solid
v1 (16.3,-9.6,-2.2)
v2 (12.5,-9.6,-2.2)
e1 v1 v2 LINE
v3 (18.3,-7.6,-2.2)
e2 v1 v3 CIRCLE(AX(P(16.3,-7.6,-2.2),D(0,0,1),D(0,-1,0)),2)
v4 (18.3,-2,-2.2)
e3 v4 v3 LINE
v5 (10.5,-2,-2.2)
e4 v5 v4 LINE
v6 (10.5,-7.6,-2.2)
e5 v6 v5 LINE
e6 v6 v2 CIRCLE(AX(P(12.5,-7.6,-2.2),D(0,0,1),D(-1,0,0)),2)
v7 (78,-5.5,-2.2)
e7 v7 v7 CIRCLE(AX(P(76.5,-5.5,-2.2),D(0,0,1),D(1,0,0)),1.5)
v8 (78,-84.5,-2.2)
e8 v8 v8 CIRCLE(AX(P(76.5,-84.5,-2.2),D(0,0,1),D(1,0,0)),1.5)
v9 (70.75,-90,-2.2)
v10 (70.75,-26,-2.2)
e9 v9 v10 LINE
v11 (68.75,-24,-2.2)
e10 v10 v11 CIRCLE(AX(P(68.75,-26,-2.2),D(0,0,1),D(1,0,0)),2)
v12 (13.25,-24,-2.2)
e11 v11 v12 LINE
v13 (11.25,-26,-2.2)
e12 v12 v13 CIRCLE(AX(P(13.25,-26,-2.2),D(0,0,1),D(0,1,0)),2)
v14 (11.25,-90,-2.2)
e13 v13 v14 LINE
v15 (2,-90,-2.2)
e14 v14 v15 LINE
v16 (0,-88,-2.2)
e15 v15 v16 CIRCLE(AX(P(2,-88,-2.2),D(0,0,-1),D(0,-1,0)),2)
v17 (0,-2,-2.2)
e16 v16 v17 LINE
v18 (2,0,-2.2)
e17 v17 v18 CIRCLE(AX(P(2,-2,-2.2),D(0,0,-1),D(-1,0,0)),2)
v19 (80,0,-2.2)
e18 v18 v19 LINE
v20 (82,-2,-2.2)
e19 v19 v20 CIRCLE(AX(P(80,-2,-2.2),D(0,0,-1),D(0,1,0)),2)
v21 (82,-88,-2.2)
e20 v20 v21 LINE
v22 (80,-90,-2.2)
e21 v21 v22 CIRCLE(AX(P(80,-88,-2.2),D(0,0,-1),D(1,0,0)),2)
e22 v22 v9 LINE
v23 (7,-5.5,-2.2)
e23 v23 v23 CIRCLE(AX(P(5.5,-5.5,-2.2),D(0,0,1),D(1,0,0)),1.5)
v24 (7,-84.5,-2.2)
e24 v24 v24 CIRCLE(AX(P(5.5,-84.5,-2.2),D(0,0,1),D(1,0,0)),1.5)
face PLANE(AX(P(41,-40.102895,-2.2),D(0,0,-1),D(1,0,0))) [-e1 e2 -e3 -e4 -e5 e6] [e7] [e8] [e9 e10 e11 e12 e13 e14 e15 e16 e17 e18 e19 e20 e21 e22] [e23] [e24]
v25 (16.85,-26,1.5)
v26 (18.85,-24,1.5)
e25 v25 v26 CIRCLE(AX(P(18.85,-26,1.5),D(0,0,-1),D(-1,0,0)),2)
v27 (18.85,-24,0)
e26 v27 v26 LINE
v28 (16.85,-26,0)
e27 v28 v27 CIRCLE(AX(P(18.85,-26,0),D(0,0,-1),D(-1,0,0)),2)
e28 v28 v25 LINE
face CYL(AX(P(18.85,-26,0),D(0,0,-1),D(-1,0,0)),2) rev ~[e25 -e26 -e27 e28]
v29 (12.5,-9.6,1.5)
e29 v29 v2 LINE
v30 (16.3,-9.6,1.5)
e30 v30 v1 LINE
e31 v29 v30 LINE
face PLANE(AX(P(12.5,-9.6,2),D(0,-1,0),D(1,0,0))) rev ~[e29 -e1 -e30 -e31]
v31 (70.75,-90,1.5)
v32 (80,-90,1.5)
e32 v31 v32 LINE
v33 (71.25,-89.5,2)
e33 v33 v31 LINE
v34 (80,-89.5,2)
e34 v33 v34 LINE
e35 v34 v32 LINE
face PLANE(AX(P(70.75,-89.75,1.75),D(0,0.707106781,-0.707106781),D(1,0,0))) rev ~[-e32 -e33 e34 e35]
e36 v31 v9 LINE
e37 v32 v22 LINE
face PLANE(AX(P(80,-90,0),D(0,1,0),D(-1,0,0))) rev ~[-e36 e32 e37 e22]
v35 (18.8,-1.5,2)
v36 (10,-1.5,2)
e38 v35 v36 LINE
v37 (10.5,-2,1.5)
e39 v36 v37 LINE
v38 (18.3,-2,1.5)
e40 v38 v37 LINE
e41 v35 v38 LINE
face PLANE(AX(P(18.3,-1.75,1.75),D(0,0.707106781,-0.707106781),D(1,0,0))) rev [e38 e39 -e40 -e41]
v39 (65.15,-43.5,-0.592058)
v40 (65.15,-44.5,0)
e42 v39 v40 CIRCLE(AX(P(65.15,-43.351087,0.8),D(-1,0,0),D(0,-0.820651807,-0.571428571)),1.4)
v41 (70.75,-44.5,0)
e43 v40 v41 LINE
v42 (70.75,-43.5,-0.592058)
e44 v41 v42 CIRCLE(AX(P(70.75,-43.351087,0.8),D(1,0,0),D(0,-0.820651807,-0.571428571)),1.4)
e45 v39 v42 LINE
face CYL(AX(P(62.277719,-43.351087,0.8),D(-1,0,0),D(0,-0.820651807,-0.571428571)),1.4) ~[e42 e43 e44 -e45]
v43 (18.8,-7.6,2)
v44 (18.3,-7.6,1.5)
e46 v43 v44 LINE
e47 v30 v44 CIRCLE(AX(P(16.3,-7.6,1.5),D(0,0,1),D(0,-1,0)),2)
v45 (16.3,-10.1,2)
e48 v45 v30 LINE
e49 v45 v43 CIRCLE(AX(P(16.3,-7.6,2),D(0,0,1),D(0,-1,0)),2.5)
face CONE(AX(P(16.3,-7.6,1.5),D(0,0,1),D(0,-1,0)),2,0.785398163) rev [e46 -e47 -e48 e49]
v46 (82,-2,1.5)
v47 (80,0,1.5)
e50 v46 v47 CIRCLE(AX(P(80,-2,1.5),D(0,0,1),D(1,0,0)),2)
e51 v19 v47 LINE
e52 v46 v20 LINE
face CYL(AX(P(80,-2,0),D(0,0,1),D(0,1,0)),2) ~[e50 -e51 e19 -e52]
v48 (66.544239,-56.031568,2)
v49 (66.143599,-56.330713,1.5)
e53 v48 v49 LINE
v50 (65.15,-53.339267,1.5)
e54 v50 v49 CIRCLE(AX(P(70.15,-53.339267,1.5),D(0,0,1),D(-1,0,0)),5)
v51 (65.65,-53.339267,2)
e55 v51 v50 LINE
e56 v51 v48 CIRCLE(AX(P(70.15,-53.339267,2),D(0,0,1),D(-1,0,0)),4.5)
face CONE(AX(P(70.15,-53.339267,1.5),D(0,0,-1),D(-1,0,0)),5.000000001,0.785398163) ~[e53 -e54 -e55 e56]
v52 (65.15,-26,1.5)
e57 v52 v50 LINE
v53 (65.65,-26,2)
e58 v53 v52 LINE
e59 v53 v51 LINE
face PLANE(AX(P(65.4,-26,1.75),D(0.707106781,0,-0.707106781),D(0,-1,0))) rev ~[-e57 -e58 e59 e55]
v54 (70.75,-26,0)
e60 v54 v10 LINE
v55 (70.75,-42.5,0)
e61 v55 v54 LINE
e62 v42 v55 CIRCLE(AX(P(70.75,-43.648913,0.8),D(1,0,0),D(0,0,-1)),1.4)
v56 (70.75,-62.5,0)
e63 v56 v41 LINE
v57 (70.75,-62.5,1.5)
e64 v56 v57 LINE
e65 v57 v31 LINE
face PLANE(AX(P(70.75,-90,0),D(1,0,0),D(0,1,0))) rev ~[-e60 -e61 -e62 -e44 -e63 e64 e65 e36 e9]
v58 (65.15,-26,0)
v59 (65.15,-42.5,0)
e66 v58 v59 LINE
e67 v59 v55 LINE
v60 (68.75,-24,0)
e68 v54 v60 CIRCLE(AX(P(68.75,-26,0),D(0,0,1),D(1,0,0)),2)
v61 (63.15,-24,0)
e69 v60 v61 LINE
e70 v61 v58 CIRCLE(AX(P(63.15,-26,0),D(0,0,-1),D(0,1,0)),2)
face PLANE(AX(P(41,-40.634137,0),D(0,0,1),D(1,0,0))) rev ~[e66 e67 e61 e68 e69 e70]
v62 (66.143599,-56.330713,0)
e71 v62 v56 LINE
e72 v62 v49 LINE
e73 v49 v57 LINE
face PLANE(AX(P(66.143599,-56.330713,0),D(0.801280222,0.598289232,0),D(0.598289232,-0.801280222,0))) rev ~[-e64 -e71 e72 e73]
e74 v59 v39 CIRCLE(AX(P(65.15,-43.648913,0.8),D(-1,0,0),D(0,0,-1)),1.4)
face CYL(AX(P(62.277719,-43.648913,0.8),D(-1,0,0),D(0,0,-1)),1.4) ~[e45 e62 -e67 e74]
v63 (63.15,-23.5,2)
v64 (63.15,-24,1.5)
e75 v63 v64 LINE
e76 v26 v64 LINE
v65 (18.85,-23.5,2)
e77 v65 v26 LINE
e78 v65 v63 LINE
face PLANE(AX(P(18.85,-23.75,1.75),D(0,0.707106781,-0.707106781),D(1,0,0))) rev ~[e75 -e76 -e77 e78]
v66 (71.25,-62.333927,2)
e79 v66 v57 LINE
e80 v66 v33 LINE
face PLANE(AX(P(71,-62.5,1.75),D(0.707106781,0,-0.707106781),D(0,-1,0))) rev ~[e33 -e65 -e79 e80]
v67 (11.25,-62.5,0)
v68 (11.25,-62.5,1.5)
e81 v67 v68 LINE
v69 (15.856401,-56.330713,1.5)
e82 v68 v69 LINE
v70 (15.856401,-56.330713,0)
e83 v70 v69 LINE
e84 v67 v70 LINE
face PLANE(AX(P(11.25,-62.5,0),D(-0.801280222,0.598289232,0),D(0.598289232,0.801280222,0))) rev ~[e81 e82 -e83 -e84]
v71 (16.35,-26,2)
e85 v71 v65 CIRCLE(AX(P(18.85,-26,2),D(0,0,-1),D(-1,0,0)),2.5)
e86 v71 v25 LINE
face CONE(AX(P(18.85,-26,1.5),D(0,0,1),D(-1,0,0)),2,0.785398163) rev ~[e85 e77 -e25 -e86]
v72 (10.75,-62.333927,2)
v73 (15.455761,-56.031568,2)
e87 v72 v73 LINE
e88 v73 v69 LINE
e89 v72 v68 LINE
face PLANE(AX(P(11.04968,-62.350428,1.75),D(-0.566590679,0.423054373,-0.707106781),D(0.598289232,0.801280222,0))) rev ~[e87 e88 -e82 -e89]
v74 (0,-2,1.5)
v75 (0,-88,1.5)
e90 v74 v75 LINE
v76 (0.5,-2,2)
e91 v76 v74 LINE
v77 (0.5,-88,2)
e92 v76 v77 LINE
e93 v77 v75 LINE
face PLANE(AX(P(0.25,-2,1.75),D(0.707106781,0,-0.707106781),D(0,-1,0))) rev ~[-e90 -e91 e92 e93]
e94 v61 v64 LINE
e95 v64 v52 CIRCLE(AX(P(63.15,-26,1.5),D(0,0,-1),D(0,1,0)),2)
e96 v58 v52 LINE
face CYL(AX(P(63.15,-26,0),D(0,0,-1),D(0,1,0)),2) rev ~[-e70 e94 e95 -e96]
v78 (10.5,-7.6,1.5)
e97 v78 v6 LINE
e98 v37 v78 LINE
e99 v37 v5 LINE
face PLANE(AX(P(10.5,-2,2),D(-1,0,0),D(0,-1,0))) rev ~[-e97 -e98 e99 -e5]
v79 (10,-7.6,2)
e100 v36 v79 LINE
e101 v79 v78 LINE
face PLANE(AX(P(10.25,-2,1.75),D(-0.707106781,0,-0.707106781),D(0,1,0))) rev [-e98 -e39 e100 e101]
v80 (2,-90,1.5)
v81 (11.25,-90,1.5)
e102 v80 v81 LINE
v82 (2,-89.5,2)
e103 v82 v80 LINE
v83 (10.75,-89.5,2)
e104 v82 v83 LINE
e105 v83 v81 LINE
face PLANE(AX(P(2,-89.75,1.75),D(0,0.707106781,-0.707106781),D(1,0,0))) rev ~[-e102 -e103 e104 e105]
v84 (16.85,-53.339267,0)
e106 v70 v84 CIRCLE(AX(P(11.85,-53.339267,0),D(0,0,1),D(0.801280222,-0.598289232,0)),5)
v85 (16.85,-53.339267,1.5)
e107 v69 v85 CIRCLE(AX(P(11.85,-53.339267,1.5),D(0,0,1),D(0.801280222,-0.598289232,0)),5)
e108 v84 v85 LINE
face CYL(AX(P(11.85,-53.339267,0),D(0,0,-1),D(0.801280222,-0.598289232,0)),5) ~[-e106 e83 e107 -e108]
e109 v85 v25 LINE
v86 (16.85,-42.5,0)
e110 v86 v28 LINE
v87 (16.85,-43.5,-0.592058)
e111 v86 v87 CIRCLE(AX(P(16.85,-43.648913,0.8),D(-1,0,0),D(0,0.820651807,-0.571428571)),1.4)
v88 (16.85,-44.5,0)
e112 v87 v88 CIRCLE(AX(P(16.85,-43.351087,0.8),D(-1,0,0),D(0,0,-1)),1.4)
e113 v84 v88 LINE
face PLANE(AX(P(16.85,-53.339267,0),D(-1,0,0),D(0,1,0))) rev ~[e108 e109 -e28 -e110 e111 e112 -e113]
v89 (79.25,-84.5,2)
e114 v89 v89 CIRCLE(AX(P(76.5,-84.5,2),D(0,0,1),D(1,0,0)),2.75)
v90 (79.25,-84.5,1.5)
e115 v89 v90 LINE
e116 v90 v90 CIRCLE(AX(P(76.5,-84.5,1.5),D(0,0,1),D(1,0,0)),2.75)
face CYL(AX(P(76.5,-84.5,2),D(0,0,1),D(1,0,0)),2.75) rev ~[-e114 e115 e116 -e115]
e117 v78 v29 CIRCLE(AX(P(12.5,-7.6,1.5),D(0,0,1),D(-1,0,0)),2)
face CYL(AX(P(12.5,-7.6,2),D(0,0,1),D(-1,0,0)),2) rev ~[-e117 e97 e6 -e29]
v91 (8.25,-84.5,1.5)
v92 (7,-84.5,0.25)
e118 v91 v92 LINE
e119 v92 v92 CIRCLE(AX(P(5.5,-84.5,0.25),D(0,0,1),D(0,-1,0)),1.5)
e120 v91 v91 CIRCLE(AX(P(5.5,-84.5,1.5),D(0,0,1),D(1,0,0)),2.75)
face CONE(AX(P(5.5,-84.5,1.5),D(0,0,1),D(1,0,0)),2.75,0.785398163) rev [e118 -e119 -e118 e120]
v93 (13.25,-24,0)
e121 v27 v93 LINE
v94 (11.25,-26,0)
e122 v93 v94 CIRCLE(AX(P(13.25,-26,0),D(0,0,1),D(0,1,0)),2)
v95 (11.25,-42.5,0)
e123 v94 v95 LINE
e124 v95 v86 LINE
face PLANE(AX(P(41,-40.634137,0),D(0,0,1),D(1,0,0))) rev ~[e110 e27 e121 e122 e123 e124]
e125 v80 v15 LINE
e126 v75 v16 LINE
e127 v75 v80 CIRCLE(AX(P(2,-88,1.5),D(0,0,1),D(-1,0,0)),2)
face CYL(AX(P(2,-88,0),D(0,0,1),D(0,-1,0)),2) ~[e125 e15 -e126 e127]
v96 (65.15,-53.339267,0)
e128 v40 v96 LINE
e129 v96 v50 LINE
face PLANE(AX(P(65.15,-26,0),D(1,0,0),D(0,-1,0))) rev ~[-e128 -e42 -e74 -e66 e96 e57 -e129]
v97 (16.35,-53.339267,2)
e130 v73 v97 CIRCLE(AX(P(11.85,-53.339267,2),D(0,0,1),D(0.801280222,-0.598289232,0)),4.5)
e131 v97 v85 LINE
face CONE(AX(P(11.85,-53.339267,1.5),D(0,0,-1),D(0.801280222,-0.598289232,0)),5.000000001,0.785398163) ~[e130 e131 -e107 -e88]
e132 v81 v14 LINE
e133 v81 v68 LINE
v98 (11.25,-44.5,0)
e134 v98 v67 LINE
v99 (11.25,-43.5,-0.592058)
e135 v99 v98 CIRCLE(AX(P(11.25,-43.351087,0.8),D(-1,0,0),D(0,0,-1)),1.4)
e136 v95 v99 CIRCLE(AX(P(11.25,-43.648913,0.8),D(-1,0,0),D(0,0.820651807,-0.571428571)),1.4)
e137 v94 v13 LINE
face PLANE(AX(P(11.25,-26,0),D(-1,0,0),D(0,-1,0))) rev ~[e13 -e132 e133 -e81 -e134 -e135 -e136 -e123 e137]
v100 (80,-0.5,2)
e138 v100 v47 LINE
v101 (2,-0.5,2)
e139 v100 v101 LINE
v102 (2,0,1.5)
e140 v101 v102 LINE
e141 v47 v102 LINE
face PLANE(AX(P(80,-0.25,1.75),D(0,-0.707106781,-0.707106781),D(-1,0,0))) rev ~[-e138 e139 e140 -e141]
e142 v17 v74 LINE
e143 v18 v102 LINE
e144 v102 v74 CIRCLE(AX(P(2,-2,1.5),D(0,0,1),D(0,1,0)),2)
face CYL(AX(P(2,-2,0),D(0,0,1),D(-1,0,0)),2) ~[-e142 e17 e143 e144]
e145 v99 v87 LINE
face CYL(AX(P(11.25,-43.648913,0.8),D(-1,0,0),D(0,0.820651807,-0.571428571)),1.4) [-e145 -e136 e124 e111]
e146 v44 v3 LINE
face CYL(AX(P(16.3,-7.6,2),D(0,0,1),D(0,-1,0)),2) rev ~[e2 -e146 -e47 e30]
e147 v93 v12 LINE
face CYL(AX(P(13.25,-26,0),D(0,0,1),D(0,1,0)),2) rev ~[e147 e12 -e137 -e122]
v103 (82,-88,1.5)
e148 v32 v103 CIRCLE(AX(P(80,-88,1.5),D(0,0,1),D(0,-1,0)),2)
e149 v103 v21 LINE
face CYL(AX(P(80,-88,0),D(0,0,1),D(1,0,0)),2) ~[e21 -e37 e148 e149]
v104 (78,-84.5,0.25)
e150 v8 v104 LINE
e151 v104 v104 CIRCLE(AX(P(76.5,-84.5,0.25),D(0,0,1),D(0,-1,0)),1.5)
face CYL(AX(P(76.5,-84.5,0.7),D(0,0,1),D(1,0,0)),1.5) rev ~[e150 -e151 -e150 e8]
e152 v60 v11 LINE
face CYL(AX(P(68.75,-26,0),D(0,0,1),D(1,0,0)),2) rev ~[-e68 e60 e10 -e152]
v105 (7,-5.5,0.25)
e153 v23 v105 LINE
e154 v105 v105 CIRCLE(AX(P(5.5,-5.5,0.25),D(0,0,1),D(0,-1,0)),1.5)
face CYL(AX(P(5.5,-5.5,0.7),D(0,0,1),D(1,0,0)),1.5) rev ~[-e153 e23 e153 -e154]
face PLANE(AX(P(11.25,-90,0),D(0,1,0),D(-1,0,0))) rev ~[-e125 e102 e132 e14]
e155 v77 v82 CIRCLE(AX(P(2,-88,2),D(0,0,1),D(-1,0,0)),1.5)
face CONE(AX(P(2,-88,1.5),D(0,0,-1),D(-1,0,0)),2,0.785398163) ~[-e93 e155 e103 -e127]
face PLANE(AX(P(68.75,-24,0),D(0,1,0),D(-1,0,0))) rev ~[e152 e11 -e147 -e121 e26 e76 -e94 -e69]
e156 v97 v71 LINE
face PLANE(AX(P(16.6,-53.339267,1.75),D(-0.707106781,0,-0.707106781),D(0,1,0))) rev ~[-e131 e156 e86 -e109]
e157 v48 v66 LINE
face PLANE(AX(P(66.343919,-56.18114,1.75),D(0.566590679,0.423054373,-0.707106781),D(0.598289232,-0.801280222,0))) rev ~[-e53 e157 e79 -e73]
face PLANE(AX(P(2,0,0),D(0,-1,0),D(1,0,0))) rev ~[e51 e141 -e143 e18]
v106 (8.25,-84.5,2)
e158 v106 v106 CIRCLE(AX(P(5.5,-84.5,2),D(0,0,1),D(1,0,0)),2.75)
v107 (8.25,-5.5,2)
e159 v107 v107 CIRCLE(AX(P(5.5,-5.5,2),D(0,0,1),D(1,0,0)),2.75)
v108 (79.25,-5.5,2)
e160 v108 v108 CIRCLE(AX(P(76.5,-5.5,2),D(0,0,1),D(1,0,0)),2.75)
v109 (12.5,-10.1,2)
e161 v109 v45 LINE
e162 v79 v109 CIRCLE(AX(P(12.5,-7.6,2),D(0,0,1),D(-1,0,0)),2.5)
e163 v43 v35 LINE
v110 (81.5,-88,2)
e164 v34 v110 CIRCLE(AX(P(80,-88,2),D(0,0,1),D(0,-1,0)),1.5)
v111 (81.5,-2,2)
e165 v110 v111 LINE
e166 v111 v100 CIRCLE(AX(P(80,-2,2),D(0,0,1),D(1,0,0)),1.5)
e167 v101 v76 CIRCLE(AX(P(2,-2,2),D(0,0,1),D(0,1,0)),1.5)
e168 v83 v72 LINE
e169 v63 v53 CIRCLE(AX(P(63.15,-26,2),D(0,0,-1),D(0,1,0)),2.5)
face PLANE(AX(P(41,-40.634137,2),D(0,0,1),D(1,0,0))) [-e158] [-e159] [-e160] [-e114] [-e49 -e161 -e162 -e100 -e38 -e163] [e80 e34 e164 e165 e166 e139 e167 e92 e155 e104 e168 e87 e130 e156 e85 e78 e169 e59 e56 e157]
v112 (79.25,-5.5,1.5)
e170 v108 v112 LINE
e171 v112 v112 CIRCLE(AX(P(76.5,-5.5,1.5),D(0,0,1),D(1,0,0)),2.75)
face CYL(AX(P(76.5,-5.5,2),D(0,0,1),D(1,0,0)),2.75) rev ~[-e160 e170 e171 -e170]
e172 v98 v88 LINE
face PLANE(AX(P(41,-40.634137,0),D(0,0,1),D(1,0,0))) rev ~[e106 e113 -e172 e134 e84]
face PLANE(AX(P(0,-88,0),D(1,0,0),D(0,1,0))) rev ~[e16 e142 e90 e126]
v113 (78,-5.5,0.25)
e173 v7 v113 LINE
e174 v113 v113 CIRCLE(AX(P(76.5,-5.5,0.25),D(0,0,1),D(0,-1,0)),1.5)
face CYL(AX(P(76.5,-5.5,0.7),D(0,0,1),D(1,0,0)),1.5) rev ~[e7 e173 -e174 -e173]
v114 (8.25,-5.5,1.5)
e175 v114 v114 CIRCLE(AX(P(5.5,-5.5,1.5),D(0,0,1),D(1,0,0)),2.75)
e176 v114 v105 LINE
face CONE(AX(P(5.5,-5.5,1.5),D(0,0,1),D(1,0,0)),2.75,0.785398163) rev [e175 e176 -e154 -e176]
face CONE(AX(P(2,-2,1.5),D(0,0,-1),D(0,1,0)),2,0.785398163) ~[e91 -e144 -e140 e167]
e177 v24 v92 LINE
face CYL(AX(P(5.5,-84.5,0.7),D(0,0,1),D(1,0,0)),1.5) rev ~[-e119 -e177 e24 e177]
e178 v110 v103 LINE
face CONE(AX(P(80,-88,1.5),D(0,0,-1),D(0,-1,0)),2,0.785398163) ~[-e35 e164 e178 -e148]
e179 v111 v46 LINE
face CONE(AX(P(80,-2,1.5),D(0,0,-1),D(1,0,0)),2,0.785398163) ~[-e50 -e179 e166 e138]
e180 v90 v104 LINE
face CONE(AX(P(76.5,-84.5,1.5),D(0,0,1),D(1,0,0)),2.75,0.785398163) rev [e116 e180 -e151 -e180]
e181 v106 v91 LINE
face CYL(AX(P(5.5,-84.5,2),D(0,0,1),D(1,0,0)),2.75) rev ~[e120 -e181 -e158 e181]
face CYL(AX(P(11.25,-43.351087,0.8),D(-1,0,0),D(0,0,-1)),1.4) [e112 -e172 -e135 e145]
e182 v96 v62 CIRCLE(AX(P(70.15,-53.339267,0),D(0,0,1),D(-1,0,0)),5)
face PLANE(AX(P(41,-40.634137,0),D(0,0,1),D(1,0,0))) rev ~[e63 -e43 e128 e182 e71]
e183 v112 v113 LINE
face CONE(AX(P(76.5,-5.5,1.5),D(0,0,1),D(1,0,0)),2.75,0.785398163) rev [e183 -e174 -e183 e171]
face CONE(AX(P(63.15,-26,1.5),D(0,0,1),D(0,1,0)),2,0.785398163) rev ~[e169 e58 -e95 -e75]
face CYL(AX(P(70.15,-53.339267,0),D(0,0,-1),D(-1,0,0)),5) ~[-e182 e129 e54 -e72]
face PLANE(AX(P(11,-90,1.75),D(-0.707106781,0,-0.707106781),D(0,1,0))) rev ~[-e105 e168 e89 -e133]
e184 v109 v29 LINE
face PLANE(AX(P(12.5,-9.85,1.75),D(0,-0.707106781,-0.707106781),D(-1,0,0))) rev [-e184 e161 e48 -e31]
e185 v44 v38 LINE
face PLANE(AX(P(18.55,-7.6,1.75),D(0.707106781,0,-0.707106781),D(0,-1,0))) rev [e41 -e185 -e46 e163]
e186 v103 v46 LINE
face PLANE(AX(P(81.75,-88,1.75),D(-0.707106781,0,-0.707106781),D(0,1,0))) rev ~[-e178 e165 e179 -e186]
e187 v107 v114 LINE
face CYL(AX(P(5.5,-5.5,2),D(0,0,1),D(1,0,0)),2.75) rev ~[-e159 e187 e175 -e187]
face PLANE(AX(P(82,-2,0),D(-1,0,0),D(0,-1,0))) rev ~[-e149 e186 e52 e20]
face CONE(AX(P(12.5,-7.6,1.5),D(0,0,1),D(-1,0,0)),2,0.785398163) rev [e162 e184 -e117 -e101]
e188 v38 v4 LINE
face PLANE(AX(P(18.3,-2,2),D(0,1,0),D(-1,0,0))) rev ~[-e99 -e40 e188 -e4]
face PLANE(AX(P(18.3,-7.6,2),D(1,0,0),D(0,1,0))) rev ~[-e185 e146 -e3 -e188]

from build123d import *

# Parameters (mm, degrees)
F1_DEPTH      = 2
F3_DEPTH      = 2.2
F5_DEPTH      = 25
F6_R          = 1.5
F7_DEPTH      = 4.2
F8_R          = 2.75
F9_DEPTH      = 2
F10_S5_R      = 1.5
F10_T6_DEPTH  = 5
F10_S11_R     = 1.5
F10_T12_DEPTH = 5
F10_S17_R     = 1.5
F10_T18_DEPTH = 5
F10_S23_R     = 1.5
F10_T24_DEPTH = 5
F11_W         = 5.6
F11_H         = 2
F12_DEPTH     = 0.6
F13_T1_DEPTH  = 8.4722813233
F13_T3_DEPTH  = 8.4722813233
F14_SIZE      = 0.5


# Not quite as in the source:
# - a fillet or chamfer that OpenCascade refuses, or shapes differently, is made with other operations: its cross-section is extruded or revolved along the edge and cut away or added


with BuildPart() as f1:
    # F0 (on Top) → F1 (new body)
    with BuildSketch(Plane.XY):
        with BuildLine():
            Line((80, 0), (2, 0))
            ThreePointArc((2, 0), (0.5857864376, -0.5857864376), (0, -2))
            Line((0, -2), (0, -88))
            ThreePointArc((0, -88), (0.5857864376, -89.4142135624), (2, -90))
            Line((2, -90), (11.25, -90))
            Line((11.25, -90), (11.25, -62.5))
            Line((11.25, -62.5), (15.8564011104, -56.3307127986))
            ThreePointArc((15.8564011104, -56.3307127986), (16.5951030311, -54.9153368199), (16.85, -53.3392666362))
            Line((16.85, -53.3392666362), (16.85, -26))
            ThreePointArc((16.85, -26), (17.4357864376, -24.5857864376), (18.85, -24))
            Line((18.85, -24), (63.15, -24))
            ThreePointArc((63.15, -24), (64.5642135624, -24.5857864376), (65.15, -26))
            Line((65.15, -26), (65.15, -53.3392666362))
            ThreePointArc((65.15, -53.3392666362), (65.4048969689, -54.9153368199), (66.1435988896, -56.3307127986))
            Line((66.1435988896, -56.3307127986), (70.75, -62.5))
            Line((70.75, -62.5), (70.75, -90))
            Line((70.75, -90), (80, -90))
            ThreePointArc((80, -90), (81.4142135624, -89.4142135624), (82, -88))
            Line((82, -88), (82, -2))
            ThreePointArc((82, -2), (81.4142135624, -0.5857864376), (80, 0))
        make_face()
    extrude(amount=F1_DEPTH)

    # F2 (on face) → F3 (join)
    with BuildSketch(Plane(origin=(0, 0, 0), x_dir=(1, 0, 0), z_dir=(0, 0, -1))):
        with BuildLine():
            ThreePointArc((80, 0), (81.4142135624, 0.5857864376), (82, 2))
            Line((82, 2), (82, 88))
            ThreePointArc((82, 88), (81.4142135624, 89.4142135624), (80, 90))
            Line((80, 90), (70.75, 90))
            Line((70.75, 90), (70.75, 62.5))
            Line((70.75, 62.5), (70.75, 26))
            ThreePointArc((70.75, 26), (70.1642135624, 24.5857864376), (68.75, 24))
            Line((68.75, 24), (65.15, 24))
            Line((65.15, 24), (16.85, 24))
            Line((16.85, 24), (13.25, 24))
            ThreePointArc((13.25, 24), (11.8357864376, 24.5857864376), (11.25, 26))
            Line((11.25, 26), (11.25, 62.5))
            Line((11.25, 62.5), (11.25, 90))
            Line((11.25, 90), (2, 90))
            ThreePointArc((2, 90), (0.5857864376, 89.4142135624), (0, 88))
            Line((0, 88), (0, 2))
            ThreePointArc((0, 2), (0.5857864376, 0.5857864376), (2, 0))
            Line((2, 0), (80, 0))
        make_face()
    extrude(amount=F3_DEPTH)

    # F4 (on face) → F5 (cut)
    with BuildSketch(Plane.XY.offset(2)):
        with BuildLine():
            Line((18.3, -2), (10.5, -2))
            Line((10.5, -2), (10.5, -7.6))
            ThreePointArc((10.5, -7.6), (11.0857864376, -9.0142135624), (12.5, -9.6))
            Line((12.5, -9.6), (16.3, -9.6))
            ThreePointArc((16.3, -9.6), (17.7142135624, -9.0142135624), (18.3, -7.6))
            Line((18.3, -7.6), (18.3, -2))
        make_face()
    extrude(amount=-F5_DEPTH, mode=Mode.SUBTRACT)

    # F6 (on face) → F7 (cut)
    with BuildSketch(Plane.XY.offset(2)):
        with Locations((5.5, -84.5)):
            Circle(F6_R)
        with Locations((76.5, -84.5)):
            Circle(F6_R)
        with Locations((5.5, -5.5)):
            Circle(F6_R)
        with Locations((76.5, -5.5)):
            Circle(F6_R)
    extrude(amount=-F7_DEPTH, mode=Mode.SUBTRACT)

    # F8 (on face) → F9 (cut)
    with BuildSketch(Plane.XY.offset(2)):
        with Locations((5.5, -5.5)):
            Circle(F8_R)
        with Locations((76.5, -5.5)):
            Circle(F8_R)
        with Locations((76.5, -84.5)):
            Circle(F8_R)
        with Locations((5.5, -84.5)):
            Circle(F8_R)
    extrude(amount=-F9_DEPTH, mode=Mode.SUBTRACT)

    # F10: chamfer of 1.5 on 4 edges, made by hand


with BuildPart() as f10_tool2:
    # F10_s3 → F10_t4 (revolve)
    with BuildSketch(Plane.XZ.offset(84.5)):
        Polygon((8.25, 1.5), (6.75, 0), (8.25, 0), align=None)
    revolve(axis=Axis((5.5, -84.5, 0), (0, 0, 1)))

    # F10_s5 → F10_t6 (cut, symmetric)
    with BuildSketch(Plane.XY.offset(0.7)):
        with Locations((5.5, -84.5)):
            Circle(F10_S5_R)
    extrude(amount=F10_T6_DEPTH, both=True, mode=Mode.SUBTRACT)


with BuildPart() as f1_1:
    add(f1.part)

    # F10_t1: union F10_tool2
    add(f10_tool2.part)


with BuildPart() as f10_tool8:
    # F10_s9 → F10_t10 (revolve)
    with BuildSketch(Plane.XZ.offset(84.5)):
        Polygon((79.25, 1.5), (77.75, 0), (79.25, 0), align=None)
    revolve(axis=Axis((76.5, -84.5, 0), (0, 0, 1)))

    # F10_s11 → F10_t12 (cut, symmetric)
    with BuildSketch(Plane.XY.offset(0.7)):
        with Locations((76.5, -84.5)):
            Circle(F10_S11_R)
    extrude(amount=F10_T12_DEPTH, both=True, mode=Mode.SUBTRACT)


with BuildPart() as f1_2:
    add(f1_1.part)

    # F10_t7: union F10_tool8
    add(f10_tool8.part)


with BuildPart() as f10_tool14:
    # F10_s15 → F10_t16 (revolve)
    with BuildSketch(Plane.XZ.offset(5.5)):
        Polygon((8.25, 1.5), (6.75, 0), (8.25, 0), align=None)
    revolve(axis=Axis((5.5, -5.5, 0), (0, 0, 1)))

    # F10_s17 → F10_t18 (cut, symmetric)
    with BuildSketch(Plane.XY.offset(0.7)):
        with Locations((5.5, -5.5)):
            Circle(F10_S17_R)
    extrude(amount=F10_T18_DEPTH, both=True, mode=Mode.SUBTRACT)


with BuildPart() as f1_3:
    add(f1_2.part)

    # F10_t13: union F10_tool14
    add(f10_tool14.part)


with BuildPart() as f10_tool20:
    # F10_s21 → F10_t22 (revolve)
    with BuildSketch(Plane.XZ.offset(5.5)):
        Polygon((79.25, 1.5), (77.75, 0), (79.25, 0), align=None)
    revolve(axis=Axis((76.5, -5.5, 0), (0, 0, 1)))

    # F10_s23 → F10_t24 (cut, symmetric)
    with BuildSketch(Plane.XY.offset(0.7)):
        with Locations((76.5, -5.5)):
            Circle(F10_S23_R)
    extrude(amount=F10_T24_DEPTH, both=True, mode=Mode.SUBTRACT)


with BuildPart() as f1_4:
    add(f1_3.part)

    # F10_t19: union F10_tool20
    add(f10_tool20.part)

    # F11 (on face) → F12 (join)
    with BuildSketch(Plane(origin=(0, 0, 0), x_dir=(1, 0, 0), z_dir=(0, 0, -1))):
        with Locations((14.05, 43.5)):
            Rectangle(F11_W, F11_H)
        with Locations((67.95, 43.5)):
            Rectangle(F11_W, F11_H)
    extrude(amount=F12_DEPTH)

    # F13: fillet of radius 1.4 on 4 edges, made by hand

    # F13_s2 → F13_t1 (cut)
    with BuildSketch(Plane.YZ.offset(11.25)):
        with BuildLine():
            ThreePointArc((-42.5, 0), (-43.0008384595, -0.4409673646), (-43.6489125293, -0.6))
            Line((-43.6489125293, -0.6), (-42.5, -0.6))
            Line((-42.5, -0.6), (-42.5, 0))
        make_face()
        with BuildLine():
            ThreePointArc((-43.3510874707, -0.6), (-43.9991615405, -0.4409673646), (-44.5, 0))
            Line((-44.5, 0), (-44.5, -0.6))
            Line((-44.5, -0.6), (-43.3510874707, -0.6))
        make_face()
    extrude(amount=F13_T1_DEPTH, mode=Mode.SUBTRACT)

    # F13_s4 → F13_t3 (cut)
    with BuildSketch(Plane.YZ.offset(62.2777186767)):
        with BuildLine():
            ThreePointArc((-43.6489125293, -0.6), (-43.0008384595, -0.4409673646), (-42.5, 0))
            Line((-42.5, 0), (-42.5, -0.6))
            Line((-42.5, -0.6), (-43.6489125293, -0.6))
        make_face()
        with BuildLine():
            ThreePointArc((-44.5, 0), (-43.9991615405, -0.4409673646), (-43.3510874707, -0.6))
            Line((-43.3510874707, -0.6), (-44.5, -0.6))
            Line((-44.5, -0.6), (-44.5, 0))
        make_face()
    extrude(amount=F13_T3_DEPTH, mode=Mode.SUBTRACT)

    # F14
    f14_edges = [f1_4.edges().sort_by_distance(p)[0] for p in [
        (0.585786, -0.585786, 2),
        (41, 0, 2),
        (0, -45, 2),
        (10.5, -4.8, 2),
        (14.4, -2, 2),
        (18.3, -4.8, 2),
        (17.714214, -9.014214, 2),
        (14.4, -9.6, 2),
        (11.085786, -9.014214, 2),
        (81.414214, -0.585786, 2),
        (82, -45, 2),
        (11.25, -76.25, 2),
        (6.625, -90, 2),
        (0.585786, -89.414214, 2),
        (81.414214, -89.414214, 2),
        (75.375, -90, 2),
        (70.75, -76.25, 2),
        (68.446799, -59.415356, 2),
        (65.404897, -54.915337, 2),
        (65.15, -39.669633, 2),
        (64.564214, -24.585786, 2),
        (41, -24, 2),
        (17.435786, -24.585786, 2),
        (16.85, -39.669633, 2),
        (16.595103, -54.915337, 2),
        (13.553201, -59.415356, 2),
    ]]
    chamfer(f14_edges, length=F14_SIZE)


solid = f1_4.part
